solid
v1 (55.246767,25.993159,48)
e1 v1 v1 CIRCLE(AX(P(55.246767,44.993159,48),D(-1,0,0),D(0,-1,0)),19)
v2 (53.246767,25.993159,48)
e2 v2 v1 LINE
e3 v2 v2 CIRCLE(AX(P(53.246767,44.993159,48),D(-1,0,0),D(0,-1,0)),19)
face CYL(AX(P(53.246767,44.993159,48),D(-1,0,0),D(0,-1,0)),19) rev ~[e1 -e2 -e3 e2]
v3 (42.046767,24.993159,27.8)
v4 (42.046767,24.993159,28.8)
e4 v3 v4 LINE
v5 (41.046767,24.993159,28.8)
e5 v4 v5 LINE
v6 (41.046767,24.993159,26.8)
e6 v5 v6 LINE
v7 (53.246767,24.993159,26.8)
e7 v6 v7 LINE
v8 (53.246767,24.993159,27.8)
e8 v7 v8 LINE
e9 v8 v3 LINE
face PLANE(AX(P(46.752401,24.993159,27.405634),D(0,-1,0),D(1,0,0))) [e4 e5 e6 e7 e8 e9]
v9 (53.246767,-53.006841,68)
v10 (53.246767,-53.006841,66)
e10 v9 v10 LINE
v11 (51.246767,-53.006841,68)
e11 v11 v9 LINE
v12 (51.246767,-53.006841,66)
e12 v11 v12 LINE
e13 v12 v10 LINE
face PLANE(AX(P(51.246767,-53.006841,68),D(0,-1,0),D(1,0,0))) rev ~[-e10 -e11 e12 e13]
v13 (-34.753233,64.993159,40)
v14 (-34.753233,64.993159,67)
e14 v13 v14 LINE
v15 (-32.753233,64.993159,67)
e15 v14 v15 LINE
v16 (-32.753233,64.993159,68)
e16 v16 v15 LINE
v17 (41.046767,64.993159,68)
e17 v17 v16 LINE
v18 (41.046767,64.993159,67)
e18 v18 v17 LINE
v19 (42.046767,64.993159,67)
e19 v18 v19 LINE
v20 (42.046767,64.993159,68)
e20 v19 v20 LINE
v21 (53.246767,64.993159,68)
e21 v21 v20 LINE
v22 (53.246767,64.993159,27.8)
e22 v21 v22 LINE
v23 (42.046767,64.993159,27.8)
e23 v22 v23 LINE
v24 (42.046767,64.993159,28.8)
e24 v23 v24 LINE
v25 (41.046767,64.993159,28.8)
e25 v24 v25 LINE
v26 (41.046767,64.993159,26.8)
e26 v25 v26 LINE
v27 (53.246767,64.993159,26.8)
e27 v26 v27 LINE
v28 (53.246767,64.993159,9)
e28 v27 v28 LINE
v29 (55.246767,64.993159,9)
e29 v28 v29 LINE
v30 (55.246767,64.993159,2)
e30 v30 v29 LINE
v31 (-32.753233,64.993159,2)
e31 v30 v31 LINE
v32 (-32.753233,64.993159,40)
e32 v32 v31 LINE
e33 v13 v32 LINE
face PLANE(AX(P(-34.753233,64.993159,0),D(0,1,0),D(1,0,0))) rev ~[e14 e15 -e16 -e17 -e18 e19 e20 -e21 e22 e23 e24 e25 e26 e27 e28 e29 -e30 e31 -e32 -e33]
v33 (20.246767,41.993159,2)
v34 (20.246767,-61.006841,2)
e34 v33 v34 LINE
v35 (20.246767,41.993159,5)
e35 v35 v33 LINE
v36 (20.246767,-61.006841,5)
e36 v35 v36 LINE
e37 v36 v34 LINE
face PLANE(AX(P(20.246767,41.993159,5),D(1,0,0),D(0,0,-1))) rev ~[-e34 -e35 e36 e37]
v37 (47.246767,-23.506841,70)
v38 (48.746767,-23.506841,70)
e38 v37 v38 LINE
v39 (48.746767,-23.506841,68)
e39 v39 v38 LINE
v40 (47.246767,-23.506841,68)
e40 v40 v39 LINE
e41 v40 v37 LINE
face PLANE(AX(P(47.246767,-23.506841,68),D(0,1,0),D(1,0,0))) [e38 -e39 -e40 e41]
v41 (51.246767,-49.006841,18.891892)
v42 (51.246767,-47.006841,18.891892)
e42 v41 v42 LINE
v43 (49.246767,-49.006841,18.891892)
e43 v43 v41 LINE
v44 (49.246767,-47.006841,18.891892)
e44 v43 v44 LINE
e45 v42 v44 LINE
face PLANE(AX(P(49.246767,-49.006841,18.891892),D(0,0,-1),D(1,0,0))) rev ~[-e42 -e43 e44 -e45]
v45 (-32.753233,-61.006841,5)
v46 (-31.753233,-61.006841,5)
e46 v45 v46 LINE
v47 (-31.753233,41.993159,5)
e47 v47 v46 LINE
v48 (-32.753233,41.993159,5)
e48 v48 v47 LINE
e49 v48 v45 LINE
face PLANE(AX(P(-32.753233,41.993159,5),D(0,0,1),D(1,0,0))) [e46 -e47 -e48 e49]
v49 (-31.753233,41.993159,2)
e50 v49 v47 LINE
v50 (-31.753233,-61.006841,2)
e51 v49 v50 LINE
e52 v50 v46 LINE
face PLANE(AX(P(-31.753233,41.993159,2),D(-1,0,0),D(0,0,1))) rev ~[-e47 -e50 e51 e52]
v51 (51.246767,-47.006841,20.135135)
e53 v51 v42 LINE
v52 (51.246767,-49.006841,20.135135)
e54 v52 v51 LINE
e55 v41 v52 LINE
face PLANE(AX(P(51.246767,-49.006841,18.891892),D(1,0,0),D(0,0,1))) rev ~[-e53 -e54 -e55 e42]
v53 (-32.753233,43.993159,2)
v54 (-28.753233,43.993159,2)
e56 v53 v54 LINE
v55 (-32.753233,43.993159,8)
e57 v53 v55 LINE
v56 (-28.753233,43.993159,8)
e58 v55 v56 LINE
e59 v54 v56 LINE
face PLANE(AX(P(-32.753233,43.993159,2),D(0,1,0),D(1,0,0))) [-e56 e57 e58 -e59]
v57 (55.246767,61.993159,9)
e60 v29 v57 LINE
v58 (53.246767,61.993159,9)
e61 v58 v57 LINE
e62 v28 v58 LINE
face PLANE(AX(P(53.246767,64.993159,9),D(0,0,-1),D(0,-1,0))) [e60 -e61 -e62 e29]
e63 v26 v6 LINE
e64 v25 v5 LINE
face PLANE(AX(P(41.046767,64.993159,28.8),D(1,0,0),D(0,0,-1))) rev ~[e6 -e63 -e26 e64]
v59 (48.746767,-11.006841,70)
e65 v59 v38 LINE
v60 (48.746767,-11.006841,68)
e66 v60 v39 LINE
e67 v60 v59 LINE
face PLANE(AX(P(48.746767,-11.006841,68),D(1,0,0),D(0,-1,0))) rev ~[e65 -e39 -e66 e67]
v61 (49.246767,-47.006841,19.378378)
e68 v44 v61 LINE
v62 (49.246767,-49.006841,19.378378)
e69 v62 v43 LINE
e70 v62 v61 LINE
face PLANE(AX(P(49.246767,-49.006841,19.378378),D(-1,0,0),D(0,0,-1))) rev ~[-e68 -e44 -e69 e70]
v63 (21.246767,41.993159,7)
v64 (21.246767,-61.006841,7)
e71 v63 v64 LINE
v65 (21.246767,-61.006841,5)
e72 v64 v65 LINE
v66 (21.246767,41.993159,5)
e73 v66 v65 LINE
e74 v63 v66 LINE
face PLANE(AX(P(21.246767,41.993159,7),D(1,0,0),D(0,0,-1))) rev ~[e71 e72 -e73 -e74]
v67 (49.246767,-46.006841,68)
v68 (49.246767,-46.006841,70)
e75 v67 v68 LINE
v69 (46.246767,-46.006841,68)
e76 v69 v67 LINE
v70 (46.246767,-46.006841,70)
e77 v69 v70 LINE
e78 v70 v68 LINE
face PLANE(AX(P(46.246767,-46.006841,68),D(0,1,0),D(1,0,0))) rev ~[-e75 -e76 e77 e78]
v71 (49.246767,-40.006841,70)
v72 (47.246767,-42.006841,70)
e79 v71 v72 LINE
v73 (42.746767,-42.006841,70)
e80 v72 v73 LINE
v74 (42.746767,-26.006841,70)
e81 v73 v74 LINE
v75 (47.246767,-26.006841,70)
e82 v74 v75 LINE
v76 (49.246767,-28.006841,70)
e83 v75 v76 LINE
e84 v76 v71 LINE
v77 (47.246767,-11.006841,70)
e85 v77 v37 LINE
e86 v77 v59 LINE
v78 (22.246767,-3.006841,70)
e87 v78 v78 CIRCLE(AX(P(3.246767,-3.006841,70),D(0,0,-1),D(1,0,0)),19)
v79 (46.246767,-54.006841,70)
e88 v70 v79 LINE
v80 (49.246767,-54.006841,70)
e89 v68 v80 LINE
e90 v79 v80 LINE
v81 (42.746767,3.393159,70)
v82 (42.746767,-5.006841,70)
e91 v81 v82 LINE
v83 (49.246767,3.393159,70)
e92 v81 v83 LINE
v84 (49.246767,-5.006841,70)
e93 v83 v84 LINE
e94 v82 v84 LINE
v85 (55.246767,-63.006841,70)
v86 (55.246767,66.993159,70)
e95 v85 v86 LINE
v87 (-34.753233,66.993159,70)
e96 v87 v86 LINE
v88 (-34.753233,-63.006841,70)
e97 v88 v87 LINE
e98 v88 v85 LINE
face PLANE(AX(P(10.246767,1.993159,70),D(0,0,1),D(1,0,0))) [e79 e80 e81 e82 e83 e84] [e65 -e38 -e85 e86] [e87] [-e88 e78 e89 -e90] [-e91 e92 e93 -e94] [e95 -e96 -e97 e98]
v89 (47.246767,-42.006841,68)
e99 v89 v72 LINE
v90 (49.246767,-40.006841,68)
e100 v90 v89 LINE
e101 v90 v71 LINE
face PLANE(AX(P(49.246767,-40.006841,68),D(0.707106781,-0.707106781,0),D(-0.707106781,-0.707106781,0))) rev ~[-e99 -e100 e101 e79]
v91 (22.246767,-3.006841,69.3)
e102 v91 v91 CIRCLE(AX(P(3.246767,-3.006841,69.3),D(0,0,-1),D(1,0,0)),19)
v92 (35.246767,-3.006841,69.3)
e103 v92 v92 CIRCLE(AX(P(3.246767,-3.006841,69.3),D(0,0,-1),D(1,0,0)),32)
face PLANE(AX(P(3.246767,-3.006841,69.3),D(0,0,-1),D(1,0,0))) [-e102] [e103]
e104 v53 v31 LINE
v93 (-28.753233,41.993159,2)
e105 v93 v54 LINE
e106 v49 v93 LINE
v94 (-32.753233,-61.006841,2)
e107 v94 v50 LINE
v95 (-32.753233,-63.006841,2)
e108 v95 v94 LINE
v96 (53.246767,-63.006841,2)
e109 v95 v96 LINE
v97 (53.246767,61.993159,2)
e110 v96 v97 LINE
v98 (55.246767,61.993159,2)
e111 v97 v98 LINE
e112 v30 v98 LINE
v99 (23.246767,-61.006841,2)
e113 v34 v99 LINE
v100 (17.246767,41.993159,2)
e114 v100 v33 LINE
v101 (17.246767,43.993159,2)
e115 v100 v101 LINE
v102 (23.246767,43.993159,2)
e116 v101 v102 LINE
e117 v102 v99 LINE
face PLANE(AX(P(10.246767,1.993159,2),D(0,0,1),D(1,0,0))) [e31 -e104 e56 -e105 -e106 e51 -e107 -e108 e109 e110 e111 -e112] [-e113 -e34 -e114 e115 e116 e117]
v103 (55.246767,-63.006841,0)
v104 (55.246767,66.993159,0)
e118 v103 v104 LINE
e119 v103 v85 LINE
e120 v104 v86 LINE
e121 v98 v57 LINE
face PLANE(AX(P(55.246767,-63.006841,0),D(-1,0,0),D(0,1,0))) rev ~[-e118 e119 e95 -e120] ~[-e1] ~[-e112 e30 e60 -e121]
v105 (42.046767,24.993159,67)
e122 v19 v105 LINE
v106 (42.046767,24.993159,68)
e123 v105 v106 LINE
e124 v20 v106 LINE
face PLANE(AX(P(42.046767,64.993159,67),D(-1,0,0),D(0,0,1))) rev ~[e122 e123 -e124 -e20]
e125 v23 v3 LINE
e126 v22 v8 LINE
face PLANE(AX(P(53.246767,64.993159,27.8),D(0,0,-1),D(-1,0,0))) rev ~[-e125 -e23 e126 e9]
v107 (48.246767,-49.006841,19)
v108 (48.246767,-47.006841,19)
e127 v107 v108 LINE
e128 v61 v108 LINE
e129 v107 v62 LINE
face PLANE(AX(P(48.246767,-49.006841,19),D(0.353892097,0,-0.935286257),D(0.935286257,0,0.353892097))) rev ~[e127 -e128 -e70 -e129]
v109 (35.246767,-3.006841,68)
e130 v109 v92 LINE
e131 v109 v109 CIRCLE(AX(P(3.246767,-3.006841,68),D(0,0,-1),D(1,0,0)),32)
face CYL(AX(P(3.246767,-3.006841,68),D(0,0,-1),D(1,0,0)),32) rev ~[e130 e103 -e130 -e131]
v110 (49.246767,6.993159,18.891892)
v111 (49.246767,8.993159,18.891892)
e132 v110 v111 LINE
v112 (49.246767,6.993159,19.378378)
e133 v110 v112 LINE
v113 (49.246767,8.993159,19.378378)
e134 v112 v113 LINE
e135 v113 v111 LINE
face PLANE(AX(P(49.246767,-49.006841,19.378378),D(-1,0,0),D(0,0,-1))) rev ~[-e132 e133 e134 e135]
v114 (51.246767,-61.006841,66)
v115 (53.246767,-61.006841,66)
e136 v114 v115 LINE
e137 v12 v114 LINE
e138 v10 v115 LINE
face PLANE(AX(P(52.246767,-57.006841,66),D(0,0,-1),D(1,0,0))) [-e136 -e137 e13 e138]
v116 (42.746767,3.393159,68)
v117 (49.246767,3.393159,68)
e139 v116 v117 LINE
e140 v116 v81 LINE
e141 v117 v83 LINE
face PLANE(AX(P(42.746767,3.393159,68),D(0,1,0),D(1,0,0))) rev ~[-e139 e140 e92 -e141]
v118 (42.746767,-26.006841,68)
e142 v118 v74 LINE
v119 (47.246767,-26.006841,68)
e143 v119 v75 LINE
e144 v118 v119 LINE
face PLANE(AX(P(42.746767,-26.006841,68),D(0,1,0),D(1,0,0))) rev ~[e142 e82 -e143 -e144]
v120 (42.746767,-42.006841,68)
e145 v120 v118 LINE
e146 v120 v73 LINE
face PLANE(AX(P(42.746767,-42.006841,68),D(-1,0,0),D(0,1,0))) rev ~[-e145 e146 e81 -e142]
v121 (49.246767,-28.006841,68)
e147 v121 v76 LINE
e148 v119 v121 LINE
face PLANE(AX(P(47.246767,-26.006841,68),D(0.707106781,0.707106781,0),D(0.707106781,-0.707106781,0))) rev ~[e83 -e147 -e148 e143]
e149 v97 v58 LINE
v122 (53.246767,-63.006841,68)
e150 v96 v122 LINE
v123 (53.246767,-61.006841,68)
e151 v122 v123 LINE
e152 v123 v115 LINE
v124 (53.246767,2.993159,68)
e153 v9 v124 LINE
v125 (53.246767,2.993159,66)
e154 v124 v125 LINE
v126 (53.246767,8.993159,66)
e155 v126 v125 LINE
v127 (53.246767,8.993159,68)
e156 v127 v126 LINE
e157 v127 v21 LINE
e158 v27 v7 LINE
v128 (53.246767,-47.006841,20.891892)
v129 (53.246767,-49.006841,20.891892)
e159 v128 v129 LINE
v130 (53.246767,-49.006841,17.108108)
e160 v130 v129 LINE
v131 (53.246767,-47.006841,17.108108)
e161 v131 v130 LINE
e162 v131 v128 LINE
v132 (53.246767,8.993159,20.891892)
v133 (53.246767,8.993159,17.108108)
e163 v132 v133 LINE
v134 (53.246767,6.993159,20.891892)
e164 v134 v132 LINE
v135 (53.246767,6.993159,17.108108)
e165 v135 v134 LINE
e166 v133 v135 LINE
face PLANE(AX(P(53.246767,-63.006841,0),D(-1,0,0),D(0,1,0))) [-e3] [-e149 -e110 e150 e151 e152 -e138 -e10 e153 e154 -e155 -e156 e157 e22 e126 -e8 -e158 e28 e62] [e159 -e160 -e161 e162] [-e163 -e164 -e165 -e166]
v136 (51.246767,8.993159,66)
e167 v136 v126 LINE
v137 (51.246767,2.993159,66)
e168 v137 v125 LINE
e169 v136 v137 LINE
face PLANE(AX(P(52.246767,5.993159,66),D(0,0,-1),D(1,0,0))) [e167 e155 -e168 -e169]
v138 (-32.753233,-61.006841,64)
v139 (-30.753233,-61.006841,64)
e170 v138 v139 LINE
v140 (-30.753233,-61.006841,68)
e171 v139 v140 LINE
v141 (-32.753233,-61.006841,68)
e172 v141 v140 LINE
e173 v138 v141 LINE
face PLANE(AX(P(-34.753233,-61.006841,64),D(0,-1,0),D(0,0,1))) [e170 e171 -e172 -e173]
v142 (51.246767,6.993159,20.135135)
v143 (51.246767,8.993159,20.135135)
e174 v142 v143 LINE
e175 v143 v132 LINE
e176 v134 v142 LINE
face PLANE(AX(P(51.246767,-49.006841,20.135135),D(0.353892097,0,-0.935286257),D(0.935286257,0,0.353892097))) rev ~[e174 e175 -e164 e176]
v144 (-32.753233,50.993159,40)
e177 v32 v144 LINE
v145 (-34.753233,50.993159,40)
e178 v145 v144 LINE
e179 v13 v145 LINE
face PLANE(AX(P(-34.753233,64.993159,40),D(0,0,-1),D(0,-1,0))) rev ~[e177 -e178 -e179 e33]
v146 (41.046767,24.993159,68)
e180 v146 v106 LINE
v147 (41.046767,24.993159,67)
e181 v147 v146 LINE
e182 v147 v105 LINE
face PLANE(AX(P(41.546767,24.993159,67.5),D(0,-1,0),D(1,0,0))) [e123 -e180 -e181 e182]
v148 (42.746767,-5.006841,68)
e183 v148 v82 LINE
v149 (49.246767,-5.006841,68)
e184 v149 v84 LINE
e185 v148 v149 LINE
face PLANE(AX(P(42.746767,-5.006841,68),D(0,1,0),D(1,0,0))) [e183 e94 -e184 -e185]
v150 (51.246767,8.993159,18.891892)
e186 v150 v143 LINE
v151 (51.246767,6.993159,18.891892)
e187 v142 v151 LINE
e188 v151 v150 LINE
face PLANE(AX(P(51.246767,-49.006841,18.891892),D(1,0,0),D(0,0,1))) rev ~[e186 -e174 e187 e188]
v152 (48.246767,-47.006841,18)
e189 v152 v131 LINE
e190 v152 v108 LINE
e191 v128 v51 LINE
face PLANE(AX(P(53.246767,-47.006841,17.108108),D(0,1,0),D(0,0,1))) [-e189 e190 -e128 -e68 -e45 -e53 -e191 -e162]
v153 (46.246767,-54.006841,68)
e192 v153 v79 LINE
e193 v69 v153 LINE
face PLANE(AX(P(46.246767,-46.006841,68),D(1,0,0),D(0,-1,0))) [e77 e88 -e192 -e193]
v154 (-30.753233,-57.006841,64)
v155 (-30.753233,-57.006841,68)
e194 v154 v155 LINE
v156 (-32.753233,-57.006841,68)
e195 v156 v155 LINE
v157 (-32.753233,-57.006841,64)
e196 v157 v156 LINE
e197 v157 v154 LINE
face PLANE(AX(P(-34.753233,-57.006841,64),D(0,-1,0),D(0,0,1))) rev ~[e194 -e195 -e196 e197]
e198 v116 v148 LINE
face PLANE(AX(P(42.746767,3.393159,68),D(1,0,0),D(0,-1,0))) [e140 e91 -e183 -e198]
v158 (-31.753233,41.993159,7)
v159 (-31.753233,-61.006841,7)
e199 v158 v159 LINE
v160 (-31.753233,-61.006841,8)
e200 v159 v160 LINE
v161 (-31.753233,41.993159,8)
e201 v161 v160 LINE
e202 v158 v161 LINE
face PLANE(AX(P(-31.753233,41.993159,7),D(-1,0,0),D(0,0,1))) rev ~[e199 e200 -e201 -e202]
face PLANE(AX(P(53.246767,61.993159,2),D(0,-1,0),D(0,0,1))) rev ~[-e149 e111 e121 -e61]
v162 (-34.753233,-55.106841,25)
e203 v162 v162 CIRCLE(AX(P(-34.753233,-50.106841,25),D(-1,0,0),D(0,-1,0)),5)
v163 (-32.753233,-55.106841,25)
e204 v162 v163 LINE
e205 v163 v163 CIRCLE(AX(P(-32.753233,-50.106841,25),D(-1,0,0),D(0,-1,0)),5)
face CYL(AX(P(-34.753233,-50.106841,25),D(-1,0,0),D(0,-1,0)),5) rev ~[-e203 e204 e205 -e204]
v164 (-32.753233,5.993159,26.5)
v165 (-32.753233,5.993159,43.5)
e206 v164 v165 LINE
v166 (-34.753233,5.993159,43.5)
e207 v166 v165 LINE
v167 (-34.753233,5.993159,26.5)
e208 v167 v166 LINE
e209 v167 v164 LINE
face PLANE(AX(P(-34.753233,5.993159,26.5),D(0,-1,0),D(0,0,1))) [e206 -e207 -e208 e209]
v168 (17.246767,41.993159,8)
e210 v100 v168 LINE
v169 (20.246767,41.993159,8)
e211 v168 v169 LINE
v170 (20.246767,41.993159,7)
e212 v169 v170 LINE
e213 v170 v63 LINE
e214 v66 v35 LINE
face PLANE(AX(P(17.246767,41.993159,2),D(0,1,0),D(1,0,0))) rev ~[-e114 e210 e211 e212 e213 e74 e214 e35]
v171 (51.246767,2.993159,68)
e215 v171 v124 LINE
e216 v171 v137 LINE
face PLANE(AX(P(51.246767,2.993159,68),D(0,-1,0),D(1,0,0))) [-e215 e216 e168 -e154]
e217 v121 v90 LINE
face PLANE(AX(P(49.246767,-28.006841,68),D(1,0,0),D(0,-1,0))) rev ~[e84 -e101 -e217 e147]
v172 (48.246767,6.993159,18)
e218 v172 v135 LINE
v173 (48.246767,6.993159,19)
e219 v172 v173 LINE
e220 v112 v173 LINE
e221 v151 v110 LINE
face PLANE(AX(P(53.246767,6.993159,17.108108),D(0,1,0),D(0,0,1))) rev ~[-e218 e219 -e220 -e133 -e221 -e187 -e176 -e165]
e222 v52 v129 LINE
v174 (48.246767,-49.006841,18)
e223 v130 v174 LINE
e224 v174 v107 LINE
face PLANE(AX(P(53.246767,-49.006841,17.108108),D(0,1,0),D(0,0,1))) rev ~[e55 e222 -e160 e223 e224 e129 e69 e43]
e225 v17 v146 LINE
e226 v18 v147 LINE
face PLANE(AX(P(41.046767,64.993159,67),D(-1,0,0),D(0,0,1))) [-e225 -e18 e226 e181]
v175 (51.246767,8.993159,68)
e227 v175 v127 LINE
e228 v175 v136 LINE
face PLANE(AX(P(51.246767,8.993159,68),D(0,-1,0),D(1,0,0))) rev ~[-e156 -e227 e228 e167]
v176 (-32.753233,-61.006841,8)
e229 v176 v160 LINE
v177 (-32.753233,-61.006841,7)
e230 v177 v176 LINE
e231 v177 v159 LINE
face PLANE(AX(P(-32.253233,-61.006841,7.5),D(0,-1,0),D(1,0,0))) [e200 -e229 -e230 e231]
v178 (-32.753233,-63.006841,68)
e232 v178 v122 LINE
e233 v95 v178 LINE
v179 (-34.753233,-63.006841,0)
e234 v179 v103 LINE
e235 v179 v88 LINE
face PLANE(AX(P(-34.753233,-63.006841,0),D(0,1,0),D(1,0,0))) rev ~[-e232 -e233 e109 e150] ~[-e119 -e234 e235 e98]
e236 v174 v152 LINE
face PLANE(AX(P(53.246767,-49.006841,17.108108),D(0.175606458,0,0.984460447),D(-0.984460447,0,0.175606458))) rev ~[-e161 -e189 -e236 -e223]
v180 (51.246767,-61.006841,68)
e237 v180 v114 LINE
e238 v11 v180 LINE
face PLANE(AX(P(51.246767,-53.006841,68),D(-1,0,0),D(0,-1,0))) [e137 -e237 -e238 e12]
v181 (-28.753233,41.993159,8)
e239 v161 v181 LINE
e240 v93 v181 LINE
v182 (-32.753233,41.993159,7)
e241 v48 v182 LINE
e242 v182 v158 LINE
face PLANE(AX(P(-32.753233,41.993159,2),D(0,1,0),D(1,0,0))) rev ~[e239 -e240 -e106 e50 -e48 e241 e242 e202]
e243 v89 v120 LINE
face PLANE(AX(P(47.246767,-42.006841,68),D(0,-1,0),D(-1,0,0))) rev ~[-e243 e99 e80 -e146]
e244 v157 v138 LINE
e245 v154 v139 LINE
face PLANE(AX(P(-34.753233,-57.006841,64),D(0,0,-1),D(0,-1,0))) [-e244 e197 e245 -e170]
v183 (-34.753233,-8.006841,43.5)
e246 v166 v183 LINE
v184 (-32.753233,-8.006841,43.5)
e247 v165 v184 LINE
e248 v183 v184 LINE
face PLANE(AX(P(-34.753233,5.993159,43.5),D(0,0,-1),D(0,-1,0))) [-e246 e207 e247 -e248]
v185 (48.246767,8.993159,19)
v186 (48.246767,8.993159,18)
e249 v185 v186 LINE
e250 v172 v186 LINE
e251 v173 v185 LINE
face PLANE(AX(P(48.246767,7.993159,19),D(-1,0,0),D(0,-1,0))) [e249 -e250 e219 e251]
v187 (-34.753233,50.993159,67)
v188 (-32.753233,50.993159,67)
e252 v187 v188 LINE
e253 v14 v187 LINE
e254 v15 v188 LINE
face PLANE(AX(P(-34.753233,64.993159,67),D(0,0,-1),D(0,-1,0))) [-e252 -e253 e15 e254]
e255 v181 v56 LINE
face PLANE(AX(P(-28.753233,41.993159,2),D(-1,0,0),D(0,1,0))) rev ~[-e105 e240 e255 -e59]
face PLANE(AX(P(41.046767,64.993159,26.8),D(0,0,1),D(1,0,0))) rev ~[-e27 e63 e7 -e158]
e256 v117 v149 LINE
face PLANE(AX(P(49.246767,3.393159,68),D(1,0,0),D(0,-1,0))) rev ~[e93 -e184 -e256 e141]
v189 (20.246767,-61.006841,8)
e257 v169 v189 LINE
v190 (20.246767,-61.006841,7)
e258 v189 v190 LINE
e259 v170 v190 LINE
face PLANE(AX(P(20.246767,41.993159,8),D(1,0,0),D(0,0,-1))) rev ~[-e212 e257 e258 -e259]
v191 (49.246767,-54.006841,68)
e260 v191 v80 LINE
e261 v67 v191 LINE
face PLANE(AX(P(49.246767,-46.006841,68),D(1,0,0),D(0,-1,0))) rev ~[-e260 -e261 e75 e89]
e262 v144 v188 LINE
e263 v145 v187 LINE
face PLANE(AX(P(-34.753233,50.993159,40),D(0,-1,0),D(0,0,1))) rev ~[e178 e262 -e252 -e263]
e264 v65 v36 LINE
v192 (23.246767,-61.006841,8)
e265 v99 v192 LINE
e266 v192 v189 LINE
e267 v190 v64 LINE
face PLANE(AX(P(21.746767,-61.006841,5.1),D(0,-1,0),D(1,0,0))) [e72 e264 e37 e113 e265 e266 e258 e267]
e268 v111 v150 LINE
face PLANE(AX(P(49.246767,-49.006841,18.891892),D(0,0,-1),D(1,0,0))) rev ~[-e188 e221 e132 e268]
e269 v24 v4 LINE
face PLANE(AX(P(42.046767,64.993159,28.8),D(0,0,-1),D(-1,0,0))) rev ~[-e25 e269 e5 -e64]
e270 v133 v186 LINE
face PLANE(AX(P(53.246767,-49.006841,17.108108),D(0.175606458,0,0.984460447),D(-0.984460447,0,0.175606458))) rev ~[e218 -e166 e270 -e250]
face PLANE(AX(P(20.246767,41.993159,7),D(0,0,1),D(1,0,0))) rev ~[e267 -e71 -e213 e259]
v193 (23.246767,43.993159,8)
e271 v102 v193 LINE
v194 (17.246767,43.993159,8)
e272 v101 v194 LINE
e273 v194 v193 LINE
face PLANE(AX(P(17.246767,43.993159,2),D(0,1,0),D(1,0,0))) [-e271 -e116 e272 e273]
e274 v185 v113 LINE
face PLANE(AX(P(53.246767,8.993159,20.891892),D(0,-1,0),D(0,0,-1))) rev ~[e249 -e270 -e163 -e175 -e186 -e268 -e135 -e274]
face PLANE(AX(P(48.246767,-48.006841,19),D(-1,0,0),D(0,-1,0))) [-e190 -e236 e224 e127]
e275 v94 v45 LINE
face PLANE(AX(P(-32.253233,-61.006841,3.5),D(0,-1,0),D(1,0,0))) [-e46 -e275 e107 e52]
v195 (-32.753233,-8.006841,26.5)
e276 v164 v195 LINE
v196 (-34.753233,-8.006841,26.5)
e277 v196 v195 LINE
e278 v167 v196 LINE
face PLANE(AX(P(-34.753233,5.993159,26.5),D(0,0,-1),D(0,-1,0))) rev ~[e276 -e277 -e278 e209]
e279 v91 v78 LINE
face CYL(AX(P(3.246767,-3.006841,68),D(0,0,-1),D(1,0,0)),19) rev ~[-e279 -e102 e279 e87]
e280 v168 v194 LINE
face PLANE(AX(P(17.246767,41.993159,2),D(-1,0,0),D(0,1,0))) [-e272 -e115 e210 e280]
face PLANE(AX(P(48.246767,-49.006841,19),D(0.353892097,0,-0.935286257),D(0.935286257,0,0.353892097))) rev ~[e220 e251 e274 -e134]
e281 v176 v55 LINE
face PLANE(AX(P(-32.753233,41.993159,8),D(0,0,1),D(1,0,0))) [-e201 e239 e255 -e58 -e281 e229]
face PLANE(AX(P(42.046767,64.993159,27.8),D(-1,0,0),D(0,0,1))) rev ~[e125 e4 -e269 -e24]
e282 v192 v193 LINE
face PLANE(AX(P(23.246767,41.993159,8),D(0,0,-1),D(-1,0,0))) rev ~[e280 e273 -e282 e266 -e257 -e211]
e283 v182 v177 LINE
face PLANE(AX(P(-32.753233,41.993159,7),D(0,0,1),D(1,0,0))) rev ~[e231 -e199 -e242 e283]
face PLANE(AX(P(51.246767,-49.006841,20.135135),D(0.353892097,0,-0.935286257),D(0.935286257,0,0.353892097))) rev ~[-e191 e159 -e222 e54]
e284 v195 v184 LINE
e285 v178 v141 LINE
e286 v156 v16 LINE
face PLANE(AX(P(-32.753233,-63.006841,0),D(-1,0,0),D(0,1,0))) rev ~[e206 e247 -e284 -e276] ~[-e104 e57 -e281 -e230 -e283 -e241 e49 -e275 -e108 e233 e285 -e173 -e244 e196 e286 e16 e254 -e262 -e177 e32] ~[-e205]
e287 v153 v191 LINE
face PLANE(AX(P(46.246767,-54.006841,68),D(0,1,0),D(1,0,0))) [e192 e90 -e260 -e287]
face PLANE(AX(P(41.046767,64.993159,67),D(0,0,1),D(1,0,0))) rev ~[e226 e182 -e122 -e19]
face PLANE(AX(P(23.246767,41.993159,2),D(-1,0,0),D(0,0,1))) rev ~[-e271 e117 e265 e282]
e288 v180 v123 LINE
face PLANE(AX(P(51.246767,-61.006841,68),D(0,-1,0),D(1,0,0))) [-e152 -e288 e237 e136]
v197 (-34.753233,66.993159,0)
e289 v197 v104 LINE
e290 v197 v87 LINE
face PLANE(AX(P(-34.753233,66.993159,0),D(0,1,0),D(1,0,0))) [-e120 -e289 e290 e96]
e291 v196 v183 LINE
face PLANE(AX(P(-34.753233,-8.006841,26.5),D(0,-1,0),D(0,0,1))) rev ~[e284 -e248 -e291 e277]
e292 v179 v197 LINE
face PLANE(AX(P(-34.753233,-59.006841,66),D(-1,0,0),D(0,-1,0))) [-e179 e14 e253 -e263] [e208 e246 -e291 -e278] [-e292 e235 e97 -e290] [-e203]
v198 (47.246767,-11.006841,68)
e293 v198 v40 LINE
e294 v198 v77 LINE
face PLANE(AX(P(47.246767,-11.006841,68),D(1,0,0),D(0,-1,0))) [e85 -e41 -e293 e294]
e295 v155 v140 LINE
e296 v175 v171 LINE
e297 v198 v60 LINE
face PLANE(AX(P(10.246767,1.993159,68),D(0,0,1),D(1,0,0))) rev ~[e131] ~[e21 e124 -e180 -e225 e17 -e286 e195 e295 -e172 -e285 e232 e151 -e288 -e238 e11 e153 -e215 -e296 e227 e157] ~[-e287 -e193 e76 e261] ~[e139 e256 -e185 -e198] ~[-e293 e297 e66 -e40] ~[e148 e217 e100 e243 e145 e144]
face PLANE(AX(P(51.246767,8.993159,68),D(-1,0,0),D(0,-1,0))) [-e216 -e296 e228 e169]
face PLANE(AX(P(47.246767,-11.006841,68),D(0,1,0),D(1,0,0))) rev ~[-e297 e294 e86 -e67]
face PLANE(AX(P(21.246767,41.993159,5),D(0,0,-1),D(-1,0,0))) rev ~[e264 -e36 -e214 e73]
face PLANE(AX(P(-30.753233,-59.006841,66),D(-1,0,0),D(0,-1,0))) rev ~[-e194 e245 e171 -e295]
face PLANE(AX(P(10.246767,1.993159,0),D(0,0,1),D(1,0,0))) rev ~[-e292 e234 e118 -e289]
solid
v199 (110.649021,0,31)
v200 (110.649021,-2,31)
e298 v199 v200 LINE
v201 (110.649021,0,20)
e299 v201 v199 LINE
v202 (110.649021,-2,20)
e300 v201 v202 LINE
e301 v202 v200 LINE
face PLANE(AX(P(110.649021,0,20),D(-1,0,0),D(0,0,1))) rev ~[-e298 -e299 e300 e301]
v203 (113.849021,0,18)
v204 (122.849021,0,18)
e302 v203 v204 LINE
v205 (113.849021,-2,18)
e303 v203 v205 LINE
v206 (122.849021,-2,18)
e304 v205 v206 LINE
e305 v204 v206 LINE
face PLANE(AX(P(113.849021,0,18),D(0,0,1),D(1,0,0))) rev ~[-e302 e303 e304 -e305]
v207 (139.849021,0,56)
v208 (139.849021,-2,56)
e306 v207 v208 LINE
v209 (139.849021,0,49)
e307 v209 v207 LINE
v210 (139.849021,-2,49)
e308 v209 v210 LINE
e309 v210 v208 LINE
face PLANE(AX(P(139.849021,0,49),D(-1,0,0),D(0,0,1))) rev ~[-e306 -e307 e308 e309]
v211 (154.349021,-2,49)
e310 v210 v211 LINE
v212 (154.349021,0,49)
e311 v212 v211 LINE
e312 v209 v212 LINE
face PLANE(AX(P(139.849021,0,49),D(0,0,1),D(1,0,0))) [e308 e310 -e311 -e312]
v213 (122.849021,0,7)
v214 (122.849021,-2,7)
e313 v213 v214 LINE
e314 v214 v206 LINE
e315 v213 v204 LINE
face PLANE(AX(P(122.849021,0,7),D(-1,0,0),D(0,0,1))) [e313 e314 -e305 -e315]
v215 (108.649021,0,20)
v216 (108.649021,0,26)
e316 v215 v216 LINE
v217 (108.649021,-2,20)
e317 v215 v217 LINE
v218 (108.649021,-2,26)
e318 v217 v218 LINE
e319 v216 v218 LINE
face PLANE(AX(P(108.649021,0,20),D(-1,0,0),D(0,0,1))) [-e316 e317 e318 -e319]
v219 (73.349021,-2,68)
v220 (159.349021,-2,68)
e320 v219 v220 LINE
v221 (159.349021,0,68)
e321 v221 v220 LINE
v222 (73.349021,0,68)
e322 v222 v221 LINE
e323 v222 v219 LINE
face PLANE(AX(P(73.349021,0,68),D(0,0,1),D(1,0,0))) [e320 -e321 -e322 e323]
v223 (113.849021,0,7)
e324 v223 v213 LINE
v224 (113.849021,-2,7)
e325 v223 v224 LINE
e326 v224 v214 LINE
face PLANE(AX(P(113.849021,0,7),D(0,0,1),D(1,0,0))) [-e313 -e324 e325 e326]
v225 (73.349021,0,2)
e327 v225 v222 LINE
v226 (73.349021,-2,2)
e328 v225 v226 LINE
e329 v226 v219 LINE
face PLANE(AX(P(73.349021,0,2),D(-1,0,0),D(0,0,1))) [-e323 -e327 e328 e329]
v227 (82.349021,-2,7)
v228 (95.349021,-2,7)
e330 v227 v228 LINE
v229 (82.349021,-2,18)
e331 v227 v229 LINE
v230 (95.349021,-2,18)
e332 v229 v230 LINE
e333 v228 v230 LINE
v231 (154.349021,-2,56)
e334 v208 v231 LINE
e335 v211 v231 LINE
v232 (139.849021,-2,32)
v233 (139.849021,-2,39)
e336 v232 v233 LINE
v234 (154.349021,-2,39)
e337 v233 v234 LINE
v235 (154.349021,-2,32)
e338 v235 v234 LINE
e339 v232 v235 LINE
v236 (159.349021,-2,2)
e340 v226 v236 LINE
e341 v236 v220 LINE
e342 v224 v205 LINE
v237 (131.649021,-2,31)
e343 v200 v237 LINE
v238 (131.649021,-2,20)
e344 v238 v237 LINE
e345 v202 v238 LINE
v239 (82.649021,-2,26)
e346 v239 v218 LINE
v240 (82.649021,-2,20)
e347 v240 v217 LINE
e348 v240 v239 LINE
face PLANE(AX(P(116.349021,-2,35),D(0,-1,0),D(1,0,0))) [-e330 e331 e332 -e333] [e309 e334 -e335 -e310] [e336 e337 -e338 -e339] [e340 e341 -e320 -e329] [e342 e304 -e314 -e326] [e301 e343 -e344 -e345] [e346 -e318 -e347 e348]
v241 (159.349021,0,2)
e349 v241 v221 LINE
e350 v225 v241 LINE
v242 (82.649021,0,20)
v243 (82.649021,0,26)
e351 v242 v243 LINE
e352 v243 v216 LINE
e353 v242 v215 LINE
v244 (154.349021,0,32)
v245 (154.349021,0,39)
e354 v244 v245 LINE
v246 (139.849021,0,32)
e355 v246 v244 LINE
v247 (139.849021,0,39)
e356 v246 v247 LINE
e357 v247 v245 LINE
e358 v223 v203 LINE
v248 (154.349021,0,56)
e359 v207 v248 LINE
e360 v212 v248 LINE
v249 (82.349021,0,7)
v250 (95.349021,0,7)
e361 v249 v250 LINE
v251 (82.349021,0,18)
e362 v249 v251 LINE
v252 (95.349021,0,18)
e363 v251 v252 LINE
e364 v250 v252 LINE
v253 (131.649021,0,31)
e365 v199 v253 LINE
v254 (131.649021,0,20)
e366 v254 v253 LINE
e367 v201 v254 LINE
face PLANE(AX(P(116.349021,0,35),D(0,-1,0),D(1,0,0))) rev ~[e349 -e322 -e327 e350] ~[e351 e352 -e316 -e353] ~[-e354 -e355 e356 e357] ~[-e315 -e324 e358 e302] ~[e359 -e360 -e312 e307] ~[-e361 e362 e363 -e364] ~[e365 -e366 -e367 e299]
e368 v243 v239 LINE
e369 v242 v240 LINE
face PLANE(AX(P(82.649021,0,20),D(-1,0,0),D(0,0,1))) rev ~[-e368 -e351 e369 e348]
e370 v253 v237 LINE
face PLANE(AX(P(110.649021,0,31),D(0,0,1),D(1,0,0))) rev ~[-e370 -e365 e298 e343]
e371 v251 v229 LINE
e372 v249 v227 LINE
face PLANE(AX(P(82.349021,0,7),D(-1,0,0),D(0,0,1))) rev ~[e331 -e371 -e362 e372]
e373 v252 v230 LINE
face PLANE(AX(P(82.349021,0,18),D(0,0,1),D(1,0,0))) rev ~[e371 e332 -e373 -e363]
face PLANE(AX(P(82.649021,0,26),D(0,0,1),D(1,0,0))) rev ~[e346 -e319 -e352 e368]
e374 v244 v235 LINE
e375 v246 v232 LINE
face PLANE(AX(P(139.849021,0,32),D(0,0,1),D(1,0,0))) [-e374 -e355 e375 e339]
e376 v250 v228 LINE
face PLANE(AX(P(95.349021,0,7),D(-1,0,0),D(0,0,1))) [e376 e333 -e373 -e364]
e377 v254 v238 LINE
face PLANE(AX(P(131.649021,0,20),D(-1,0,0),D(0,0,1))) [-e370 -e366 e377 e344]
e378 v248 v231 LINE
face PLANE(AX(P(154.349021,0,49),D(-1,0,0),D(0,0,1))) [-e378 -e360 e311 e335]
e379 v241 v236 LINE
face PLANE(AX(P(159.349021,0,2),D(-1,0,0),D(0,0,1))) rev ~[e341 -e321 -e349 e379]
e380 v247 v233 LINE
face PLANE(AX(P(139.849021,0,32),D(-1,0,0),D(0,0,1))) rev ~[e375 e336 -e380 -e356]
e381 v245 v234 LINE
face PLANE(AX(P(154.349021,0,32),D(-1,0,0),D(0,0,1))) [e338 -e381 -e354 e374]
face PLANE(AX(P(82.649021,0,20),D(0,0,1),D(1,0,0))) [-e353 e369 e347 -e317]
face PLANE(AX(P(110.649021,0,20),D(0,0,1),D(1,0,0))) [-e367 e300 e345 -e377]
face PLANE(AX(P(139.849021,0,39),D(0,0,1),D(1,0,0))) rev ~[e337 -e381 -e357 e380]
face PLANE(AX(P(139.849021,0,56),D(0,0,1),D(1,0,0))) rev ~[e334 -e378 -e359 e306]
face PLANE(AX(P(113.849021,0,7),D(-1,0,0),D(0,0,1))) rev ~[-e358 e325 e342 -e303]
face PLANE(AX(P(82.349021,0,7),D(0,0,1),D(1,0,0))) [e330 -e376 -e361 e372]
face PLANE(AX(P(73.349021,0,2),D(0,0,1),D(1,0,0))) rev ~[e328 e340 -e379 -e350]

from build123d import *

# Parameters (mm, degrees)
F0_W      = 90
F0_H      = 130
F1_DEPTH  = 70
F2_T      = -2
F3_W      = 4
F3_H      = 2
F3_W_2    = 6
F4_DEPTH  = 6
F5_W      = 1
F5_H      = 3
F5_H_2    = 1
F6_DEPTH  = 103
F7_W      = 2
F7_H      = 3.7837837838
F8_DEPTH  = 5
F10_DEPTH = 70
F11_W     = 6.5
F11_H     = 8.4
F11_W_2   = 1.5
F11_H_2   = 12.5
F11_W_3   = 3
F11_H_3   = 8
F11_R     = 19
F12_DEPTH = 2
F11_R_2   = 32
F13_DEPTH = 1.3
F11_W_4   = 2
F11_H_4   = 6
F14_DEPTH = 2
F15_W     = 1
F15_H     = 1
F16_DEPTH = 40
F17_R     = 19
F18_DEPTH = 2
F19_W     = 86
F19_H     = 66
F19_W_2   = 13
F19_H_2   = 11
F19_W_3   = 26
F19_H_3   = 6
F19_W_4   = 9
F19_W_5   = 21
F19_W_6   = 14.5
F19_H_4   = 7
F20_DEPTH = 2
F21_W     = 3
F21_H     = 7
F22_DEPTH = 2
F23_W     = 14
F23_H     = 27
F23_H_2   = 17
F23_R     = 5
F24_DEPTH = 2
F23_W_2   = 4
F23_H_3   = 4
F25_DEPTH = 4


# Not quite as in the source:
# - a feature names something its author has since deleted; it is built from what else it names


with BuildPart() as f1:
    # F0 (on Top) → F1 (new body)
    with BuildSketch(Plane.XY):
        with Locations((10.2467668056, 1.9931593537)):
            Rectangle(F0_W, F0_H)
    extrude(amount=F1_DEPTH)

    # F2
    f2_openings = [f1.faces().sort_by_distance(p)[0] for p in [
        (10.246767, -63.006841, 35),
    ]]
    offset(amount=F2_T, openings=f2_openings)

    # F3 (on face) → F4 (join)
    with BuildSketch(Plane.XY.offset(2)):
        with Locations((-30.7532331944, 42.9931593537)):
            Rectangle(F3_W, F3_H)
        with Locations((20.2467668056, 42.9931593537)):
            Rectangle(F3_W_2, F3_H)
    extrude(amount=F4_DEPTH)

    # F5 (on face) → F6 (join)
    with BuildSketch(Plane.XZ.offset(-41.9931593537)):
        Polygon((20.2467668056, 7), (21.2467668056, 7), (21.2467668056, 5), (20.2467668056, 5), (20.2467668056, 2), (23.2467668056, 2), (23.2467668056, 8), (20.2467668056, 8), align=None)
        with Locations((-32.2532331944, 3.5)):
            Rectangle(F5_W, F5_H)
        with Locations((-32.2532331944, 7.5)):
            Rectangle(F5_W, F5_H_2)
    extrude(amount=F6_DEPTH)

    # F7 (on face) → F8 (join)
    with BuildSketch(Plane(origin=(53.2467668056, 0, 0), x_dir=(0, -1, 0), z_dir=(-1, 0, 0))):
        Polygon((-8.9931593537, 20.8918918919), (-8.9931593537, 17.1081081081), (-6.9931593537, 17.1081081081), (-6.9931593537, 19), (-6.9931593537, 20.8918918919), align=None)
        with Locations((48.0068406463, 19)):
            Rectangle(F7_W, F7_H)
    extrude(amount=F8_DEPTH)

    # F9 (on face) → F10 (cut)
    with BuildSketch(Plane.XZ.offset(49.0068406463)):
        Polygon((51.2467668056, 20.1351351351), (53.2467668056, 20.8918918919), (48.2467668056, 20.8918918919), (48.2467668056, 19), (49.2467668056, 19.3783783784), (49.2467668056, 18.8918918919), (51.2467668056, 18.8918918919), align=None)
        Polygon((48.2467668056, 17.1081081081), (53.2467668056, 17.1081081081), (48.2467668056, 18), align=None)
    extrude(amount=-F10_DEPTH, mode=Mode.SUBTRACT)

    # F11 (on face) → F12 (cut)
    with BuildSketch(Plane(origin=(0, 0, 68), x_dir=(1, 0, 0), z_dir=(0, 0, -1))):
        with Locations((45.9967668056, 0.8068406463)):
            Rectangle(F11_W, F11_H)
        with Locations((47.9967668056, 17.2568406463)):
            Rectangle(F11_W_2, F11_H_2)
        Polygon((49.2467668056, 28.0068406463), (49.2467668056, 40.0068406463), (47.2467668056, 42.0068406463), (42.7467668056, 42.0068406463), (42.7467668056, 26.0068406463), (47.2467668056, 26.0068406463), align=None)
        with Locations((47.7467668056, 50.0068406463)):
            Rectangle(F11_W_3, F11_H_3)
        with Locations((3.2467668056, 3.0068406463)):
            Circle(F11_R)
    extrude(amount=-F12_DEPTH, mode=Mode.SUBTRACT)

    # F11 (on face) → F13 (cut)
    with BuildSketch(Plane(origin=(0, 0, 68), x_dir=(1, 0, 0), z_dir=(0, 0, -1))):
        with Locations((3.2467668056, 3.0068406463)):
            Circle(F11_R_2)
        with Locations((3.2467668056, 3.0068406463)):
            Circle(F11_R, mode=Mode.SUBTRACT)
    extrude(amount=-F13_DEPTH, mode=Mode.SUBTRACT)

    # F11 (on face) → F14 (join)
    with BuildSketch(Plane(origin=(0, 0, 68), x_dir=(1, 0, 0), z_dir=(0, 0, -1))):
        with Locations((52.2467668056, -5.9931593537)):
            Rectangle(F11_W_4, F11_H_4)
        with Locations((52.2467668056, 57.0068406463)):
            Rectangle(F11_W_4, F11_H_3)
    extrude(amount=F14_DEPTH)

    # F15 (on face) → F16 (join)
    with BuildSketch(Plane.XZ.offset(-64.9931593537)):
        Polygon((53.2467668056, 26.8), (53.2467668056, 27.8), (42.0467668056, 27.8), (42.0467668056, 28.8), (41.0467668056, 28.8), (41.0467668056, 26.8), align=None)
        with Locations((41.5467668056, 67.5)):
            Rectangle(F15_W, F15_H)
    extrude(amount=F16_DEPTH)

    # F17 (on face) → F18 (cut)
    with BuildSketch(Plane(origin=(53.2467668056, 0, 0), x_dir=(0, -1, 0), z_dir=(-1, 0, 0))):
        with Locations((-44.9931593537, 48)):
            Circle(F17_R)
    extrude(amount=-F18_DEPTH, mode=Mode.SUBTRACT)

    # F21 (on face) → F22 (cut)
    with BuildSketch(Plane(origin=(53.2467668056, 0, 0), x_dir=(0, -1, 0), z_dir=(-1, 0, 0))):
        with Locations((-63.4931593537, 5.5)):
            Rectangle(F21_W, F21_H)
    extrude(amount=-F22_DEPTH, mode=Mode.SUBTRACT)

    # F23 (on face) → F24 (cut)
    with BuildSketch(Plane(origin=(-34.7532331944, 0, 0), x_dir=(0, -1, 0), z_dir=(-1, 0, 0))):
        with Locations((-57.9931593537, 53.5)):
            Rectangle(F23_W, F23_H)
        with Locations((1.0068406463, 35)):
            Rectangle(F23_W, F23_H_2)
        with Locations((50.1068407744, 25)):
            Circle(F23_R)
    extrude(amount=-F24_DEPTH, mode=Mode.SUBTRACT)

    # F23 (on face) → F25 (join)
    with BuildSketch(Plane(origin=(-34.7532331944, 0, 0), x_dir=(0, -1, 0), z_dir=(-1, 0, 0))):
        with Locations((59.0068406463, 66)):
            Rectangle(F23_W_2, F23_H_3)
    extrude(amount=-F25_DEPTH)


with BuildPart() as f20:
    # F19 (on Front) → F20 (new body)
    with BuildSketch(Plane.XZ):
        with Locations((116.3490213752, 35)):
            Rectangle(F19_W, F19_H)
        with Locations((88.8490213752, 12.5)):
            Rectangle(F19_W_2, F19_H_2, mode=Mode.SUBTRACT)
        with Locations((95.6490213752, 23)):
            Rectangle(F19_W_3, F19_H_3, mode=Mode.SUBTRACT)
        with Locations((118.3490213752, 12.5)):
            Rectangle(F19_W_4, F19_H_2, mode=Mode.SUBTRACT)
        with Locations((121.1490213752, 25.5)):
            Rectangle(F19_W_5, F19_H_2, mode=Mode.SUBTRACT)
        with Locations((147.0990213752, 35.5)):
            Rectangle(F19_W_6, F19_H_4, mode=Mode.SUBTRACT)
        with Locations((147.0990213752, 52.5)):
            Rectangle(F19_W_6, F19_H_4, mode=Mode.SUBTRACT)
    extrude(amount=F20_DEPTH)


solid = Compound([f1.part, f20.part])
